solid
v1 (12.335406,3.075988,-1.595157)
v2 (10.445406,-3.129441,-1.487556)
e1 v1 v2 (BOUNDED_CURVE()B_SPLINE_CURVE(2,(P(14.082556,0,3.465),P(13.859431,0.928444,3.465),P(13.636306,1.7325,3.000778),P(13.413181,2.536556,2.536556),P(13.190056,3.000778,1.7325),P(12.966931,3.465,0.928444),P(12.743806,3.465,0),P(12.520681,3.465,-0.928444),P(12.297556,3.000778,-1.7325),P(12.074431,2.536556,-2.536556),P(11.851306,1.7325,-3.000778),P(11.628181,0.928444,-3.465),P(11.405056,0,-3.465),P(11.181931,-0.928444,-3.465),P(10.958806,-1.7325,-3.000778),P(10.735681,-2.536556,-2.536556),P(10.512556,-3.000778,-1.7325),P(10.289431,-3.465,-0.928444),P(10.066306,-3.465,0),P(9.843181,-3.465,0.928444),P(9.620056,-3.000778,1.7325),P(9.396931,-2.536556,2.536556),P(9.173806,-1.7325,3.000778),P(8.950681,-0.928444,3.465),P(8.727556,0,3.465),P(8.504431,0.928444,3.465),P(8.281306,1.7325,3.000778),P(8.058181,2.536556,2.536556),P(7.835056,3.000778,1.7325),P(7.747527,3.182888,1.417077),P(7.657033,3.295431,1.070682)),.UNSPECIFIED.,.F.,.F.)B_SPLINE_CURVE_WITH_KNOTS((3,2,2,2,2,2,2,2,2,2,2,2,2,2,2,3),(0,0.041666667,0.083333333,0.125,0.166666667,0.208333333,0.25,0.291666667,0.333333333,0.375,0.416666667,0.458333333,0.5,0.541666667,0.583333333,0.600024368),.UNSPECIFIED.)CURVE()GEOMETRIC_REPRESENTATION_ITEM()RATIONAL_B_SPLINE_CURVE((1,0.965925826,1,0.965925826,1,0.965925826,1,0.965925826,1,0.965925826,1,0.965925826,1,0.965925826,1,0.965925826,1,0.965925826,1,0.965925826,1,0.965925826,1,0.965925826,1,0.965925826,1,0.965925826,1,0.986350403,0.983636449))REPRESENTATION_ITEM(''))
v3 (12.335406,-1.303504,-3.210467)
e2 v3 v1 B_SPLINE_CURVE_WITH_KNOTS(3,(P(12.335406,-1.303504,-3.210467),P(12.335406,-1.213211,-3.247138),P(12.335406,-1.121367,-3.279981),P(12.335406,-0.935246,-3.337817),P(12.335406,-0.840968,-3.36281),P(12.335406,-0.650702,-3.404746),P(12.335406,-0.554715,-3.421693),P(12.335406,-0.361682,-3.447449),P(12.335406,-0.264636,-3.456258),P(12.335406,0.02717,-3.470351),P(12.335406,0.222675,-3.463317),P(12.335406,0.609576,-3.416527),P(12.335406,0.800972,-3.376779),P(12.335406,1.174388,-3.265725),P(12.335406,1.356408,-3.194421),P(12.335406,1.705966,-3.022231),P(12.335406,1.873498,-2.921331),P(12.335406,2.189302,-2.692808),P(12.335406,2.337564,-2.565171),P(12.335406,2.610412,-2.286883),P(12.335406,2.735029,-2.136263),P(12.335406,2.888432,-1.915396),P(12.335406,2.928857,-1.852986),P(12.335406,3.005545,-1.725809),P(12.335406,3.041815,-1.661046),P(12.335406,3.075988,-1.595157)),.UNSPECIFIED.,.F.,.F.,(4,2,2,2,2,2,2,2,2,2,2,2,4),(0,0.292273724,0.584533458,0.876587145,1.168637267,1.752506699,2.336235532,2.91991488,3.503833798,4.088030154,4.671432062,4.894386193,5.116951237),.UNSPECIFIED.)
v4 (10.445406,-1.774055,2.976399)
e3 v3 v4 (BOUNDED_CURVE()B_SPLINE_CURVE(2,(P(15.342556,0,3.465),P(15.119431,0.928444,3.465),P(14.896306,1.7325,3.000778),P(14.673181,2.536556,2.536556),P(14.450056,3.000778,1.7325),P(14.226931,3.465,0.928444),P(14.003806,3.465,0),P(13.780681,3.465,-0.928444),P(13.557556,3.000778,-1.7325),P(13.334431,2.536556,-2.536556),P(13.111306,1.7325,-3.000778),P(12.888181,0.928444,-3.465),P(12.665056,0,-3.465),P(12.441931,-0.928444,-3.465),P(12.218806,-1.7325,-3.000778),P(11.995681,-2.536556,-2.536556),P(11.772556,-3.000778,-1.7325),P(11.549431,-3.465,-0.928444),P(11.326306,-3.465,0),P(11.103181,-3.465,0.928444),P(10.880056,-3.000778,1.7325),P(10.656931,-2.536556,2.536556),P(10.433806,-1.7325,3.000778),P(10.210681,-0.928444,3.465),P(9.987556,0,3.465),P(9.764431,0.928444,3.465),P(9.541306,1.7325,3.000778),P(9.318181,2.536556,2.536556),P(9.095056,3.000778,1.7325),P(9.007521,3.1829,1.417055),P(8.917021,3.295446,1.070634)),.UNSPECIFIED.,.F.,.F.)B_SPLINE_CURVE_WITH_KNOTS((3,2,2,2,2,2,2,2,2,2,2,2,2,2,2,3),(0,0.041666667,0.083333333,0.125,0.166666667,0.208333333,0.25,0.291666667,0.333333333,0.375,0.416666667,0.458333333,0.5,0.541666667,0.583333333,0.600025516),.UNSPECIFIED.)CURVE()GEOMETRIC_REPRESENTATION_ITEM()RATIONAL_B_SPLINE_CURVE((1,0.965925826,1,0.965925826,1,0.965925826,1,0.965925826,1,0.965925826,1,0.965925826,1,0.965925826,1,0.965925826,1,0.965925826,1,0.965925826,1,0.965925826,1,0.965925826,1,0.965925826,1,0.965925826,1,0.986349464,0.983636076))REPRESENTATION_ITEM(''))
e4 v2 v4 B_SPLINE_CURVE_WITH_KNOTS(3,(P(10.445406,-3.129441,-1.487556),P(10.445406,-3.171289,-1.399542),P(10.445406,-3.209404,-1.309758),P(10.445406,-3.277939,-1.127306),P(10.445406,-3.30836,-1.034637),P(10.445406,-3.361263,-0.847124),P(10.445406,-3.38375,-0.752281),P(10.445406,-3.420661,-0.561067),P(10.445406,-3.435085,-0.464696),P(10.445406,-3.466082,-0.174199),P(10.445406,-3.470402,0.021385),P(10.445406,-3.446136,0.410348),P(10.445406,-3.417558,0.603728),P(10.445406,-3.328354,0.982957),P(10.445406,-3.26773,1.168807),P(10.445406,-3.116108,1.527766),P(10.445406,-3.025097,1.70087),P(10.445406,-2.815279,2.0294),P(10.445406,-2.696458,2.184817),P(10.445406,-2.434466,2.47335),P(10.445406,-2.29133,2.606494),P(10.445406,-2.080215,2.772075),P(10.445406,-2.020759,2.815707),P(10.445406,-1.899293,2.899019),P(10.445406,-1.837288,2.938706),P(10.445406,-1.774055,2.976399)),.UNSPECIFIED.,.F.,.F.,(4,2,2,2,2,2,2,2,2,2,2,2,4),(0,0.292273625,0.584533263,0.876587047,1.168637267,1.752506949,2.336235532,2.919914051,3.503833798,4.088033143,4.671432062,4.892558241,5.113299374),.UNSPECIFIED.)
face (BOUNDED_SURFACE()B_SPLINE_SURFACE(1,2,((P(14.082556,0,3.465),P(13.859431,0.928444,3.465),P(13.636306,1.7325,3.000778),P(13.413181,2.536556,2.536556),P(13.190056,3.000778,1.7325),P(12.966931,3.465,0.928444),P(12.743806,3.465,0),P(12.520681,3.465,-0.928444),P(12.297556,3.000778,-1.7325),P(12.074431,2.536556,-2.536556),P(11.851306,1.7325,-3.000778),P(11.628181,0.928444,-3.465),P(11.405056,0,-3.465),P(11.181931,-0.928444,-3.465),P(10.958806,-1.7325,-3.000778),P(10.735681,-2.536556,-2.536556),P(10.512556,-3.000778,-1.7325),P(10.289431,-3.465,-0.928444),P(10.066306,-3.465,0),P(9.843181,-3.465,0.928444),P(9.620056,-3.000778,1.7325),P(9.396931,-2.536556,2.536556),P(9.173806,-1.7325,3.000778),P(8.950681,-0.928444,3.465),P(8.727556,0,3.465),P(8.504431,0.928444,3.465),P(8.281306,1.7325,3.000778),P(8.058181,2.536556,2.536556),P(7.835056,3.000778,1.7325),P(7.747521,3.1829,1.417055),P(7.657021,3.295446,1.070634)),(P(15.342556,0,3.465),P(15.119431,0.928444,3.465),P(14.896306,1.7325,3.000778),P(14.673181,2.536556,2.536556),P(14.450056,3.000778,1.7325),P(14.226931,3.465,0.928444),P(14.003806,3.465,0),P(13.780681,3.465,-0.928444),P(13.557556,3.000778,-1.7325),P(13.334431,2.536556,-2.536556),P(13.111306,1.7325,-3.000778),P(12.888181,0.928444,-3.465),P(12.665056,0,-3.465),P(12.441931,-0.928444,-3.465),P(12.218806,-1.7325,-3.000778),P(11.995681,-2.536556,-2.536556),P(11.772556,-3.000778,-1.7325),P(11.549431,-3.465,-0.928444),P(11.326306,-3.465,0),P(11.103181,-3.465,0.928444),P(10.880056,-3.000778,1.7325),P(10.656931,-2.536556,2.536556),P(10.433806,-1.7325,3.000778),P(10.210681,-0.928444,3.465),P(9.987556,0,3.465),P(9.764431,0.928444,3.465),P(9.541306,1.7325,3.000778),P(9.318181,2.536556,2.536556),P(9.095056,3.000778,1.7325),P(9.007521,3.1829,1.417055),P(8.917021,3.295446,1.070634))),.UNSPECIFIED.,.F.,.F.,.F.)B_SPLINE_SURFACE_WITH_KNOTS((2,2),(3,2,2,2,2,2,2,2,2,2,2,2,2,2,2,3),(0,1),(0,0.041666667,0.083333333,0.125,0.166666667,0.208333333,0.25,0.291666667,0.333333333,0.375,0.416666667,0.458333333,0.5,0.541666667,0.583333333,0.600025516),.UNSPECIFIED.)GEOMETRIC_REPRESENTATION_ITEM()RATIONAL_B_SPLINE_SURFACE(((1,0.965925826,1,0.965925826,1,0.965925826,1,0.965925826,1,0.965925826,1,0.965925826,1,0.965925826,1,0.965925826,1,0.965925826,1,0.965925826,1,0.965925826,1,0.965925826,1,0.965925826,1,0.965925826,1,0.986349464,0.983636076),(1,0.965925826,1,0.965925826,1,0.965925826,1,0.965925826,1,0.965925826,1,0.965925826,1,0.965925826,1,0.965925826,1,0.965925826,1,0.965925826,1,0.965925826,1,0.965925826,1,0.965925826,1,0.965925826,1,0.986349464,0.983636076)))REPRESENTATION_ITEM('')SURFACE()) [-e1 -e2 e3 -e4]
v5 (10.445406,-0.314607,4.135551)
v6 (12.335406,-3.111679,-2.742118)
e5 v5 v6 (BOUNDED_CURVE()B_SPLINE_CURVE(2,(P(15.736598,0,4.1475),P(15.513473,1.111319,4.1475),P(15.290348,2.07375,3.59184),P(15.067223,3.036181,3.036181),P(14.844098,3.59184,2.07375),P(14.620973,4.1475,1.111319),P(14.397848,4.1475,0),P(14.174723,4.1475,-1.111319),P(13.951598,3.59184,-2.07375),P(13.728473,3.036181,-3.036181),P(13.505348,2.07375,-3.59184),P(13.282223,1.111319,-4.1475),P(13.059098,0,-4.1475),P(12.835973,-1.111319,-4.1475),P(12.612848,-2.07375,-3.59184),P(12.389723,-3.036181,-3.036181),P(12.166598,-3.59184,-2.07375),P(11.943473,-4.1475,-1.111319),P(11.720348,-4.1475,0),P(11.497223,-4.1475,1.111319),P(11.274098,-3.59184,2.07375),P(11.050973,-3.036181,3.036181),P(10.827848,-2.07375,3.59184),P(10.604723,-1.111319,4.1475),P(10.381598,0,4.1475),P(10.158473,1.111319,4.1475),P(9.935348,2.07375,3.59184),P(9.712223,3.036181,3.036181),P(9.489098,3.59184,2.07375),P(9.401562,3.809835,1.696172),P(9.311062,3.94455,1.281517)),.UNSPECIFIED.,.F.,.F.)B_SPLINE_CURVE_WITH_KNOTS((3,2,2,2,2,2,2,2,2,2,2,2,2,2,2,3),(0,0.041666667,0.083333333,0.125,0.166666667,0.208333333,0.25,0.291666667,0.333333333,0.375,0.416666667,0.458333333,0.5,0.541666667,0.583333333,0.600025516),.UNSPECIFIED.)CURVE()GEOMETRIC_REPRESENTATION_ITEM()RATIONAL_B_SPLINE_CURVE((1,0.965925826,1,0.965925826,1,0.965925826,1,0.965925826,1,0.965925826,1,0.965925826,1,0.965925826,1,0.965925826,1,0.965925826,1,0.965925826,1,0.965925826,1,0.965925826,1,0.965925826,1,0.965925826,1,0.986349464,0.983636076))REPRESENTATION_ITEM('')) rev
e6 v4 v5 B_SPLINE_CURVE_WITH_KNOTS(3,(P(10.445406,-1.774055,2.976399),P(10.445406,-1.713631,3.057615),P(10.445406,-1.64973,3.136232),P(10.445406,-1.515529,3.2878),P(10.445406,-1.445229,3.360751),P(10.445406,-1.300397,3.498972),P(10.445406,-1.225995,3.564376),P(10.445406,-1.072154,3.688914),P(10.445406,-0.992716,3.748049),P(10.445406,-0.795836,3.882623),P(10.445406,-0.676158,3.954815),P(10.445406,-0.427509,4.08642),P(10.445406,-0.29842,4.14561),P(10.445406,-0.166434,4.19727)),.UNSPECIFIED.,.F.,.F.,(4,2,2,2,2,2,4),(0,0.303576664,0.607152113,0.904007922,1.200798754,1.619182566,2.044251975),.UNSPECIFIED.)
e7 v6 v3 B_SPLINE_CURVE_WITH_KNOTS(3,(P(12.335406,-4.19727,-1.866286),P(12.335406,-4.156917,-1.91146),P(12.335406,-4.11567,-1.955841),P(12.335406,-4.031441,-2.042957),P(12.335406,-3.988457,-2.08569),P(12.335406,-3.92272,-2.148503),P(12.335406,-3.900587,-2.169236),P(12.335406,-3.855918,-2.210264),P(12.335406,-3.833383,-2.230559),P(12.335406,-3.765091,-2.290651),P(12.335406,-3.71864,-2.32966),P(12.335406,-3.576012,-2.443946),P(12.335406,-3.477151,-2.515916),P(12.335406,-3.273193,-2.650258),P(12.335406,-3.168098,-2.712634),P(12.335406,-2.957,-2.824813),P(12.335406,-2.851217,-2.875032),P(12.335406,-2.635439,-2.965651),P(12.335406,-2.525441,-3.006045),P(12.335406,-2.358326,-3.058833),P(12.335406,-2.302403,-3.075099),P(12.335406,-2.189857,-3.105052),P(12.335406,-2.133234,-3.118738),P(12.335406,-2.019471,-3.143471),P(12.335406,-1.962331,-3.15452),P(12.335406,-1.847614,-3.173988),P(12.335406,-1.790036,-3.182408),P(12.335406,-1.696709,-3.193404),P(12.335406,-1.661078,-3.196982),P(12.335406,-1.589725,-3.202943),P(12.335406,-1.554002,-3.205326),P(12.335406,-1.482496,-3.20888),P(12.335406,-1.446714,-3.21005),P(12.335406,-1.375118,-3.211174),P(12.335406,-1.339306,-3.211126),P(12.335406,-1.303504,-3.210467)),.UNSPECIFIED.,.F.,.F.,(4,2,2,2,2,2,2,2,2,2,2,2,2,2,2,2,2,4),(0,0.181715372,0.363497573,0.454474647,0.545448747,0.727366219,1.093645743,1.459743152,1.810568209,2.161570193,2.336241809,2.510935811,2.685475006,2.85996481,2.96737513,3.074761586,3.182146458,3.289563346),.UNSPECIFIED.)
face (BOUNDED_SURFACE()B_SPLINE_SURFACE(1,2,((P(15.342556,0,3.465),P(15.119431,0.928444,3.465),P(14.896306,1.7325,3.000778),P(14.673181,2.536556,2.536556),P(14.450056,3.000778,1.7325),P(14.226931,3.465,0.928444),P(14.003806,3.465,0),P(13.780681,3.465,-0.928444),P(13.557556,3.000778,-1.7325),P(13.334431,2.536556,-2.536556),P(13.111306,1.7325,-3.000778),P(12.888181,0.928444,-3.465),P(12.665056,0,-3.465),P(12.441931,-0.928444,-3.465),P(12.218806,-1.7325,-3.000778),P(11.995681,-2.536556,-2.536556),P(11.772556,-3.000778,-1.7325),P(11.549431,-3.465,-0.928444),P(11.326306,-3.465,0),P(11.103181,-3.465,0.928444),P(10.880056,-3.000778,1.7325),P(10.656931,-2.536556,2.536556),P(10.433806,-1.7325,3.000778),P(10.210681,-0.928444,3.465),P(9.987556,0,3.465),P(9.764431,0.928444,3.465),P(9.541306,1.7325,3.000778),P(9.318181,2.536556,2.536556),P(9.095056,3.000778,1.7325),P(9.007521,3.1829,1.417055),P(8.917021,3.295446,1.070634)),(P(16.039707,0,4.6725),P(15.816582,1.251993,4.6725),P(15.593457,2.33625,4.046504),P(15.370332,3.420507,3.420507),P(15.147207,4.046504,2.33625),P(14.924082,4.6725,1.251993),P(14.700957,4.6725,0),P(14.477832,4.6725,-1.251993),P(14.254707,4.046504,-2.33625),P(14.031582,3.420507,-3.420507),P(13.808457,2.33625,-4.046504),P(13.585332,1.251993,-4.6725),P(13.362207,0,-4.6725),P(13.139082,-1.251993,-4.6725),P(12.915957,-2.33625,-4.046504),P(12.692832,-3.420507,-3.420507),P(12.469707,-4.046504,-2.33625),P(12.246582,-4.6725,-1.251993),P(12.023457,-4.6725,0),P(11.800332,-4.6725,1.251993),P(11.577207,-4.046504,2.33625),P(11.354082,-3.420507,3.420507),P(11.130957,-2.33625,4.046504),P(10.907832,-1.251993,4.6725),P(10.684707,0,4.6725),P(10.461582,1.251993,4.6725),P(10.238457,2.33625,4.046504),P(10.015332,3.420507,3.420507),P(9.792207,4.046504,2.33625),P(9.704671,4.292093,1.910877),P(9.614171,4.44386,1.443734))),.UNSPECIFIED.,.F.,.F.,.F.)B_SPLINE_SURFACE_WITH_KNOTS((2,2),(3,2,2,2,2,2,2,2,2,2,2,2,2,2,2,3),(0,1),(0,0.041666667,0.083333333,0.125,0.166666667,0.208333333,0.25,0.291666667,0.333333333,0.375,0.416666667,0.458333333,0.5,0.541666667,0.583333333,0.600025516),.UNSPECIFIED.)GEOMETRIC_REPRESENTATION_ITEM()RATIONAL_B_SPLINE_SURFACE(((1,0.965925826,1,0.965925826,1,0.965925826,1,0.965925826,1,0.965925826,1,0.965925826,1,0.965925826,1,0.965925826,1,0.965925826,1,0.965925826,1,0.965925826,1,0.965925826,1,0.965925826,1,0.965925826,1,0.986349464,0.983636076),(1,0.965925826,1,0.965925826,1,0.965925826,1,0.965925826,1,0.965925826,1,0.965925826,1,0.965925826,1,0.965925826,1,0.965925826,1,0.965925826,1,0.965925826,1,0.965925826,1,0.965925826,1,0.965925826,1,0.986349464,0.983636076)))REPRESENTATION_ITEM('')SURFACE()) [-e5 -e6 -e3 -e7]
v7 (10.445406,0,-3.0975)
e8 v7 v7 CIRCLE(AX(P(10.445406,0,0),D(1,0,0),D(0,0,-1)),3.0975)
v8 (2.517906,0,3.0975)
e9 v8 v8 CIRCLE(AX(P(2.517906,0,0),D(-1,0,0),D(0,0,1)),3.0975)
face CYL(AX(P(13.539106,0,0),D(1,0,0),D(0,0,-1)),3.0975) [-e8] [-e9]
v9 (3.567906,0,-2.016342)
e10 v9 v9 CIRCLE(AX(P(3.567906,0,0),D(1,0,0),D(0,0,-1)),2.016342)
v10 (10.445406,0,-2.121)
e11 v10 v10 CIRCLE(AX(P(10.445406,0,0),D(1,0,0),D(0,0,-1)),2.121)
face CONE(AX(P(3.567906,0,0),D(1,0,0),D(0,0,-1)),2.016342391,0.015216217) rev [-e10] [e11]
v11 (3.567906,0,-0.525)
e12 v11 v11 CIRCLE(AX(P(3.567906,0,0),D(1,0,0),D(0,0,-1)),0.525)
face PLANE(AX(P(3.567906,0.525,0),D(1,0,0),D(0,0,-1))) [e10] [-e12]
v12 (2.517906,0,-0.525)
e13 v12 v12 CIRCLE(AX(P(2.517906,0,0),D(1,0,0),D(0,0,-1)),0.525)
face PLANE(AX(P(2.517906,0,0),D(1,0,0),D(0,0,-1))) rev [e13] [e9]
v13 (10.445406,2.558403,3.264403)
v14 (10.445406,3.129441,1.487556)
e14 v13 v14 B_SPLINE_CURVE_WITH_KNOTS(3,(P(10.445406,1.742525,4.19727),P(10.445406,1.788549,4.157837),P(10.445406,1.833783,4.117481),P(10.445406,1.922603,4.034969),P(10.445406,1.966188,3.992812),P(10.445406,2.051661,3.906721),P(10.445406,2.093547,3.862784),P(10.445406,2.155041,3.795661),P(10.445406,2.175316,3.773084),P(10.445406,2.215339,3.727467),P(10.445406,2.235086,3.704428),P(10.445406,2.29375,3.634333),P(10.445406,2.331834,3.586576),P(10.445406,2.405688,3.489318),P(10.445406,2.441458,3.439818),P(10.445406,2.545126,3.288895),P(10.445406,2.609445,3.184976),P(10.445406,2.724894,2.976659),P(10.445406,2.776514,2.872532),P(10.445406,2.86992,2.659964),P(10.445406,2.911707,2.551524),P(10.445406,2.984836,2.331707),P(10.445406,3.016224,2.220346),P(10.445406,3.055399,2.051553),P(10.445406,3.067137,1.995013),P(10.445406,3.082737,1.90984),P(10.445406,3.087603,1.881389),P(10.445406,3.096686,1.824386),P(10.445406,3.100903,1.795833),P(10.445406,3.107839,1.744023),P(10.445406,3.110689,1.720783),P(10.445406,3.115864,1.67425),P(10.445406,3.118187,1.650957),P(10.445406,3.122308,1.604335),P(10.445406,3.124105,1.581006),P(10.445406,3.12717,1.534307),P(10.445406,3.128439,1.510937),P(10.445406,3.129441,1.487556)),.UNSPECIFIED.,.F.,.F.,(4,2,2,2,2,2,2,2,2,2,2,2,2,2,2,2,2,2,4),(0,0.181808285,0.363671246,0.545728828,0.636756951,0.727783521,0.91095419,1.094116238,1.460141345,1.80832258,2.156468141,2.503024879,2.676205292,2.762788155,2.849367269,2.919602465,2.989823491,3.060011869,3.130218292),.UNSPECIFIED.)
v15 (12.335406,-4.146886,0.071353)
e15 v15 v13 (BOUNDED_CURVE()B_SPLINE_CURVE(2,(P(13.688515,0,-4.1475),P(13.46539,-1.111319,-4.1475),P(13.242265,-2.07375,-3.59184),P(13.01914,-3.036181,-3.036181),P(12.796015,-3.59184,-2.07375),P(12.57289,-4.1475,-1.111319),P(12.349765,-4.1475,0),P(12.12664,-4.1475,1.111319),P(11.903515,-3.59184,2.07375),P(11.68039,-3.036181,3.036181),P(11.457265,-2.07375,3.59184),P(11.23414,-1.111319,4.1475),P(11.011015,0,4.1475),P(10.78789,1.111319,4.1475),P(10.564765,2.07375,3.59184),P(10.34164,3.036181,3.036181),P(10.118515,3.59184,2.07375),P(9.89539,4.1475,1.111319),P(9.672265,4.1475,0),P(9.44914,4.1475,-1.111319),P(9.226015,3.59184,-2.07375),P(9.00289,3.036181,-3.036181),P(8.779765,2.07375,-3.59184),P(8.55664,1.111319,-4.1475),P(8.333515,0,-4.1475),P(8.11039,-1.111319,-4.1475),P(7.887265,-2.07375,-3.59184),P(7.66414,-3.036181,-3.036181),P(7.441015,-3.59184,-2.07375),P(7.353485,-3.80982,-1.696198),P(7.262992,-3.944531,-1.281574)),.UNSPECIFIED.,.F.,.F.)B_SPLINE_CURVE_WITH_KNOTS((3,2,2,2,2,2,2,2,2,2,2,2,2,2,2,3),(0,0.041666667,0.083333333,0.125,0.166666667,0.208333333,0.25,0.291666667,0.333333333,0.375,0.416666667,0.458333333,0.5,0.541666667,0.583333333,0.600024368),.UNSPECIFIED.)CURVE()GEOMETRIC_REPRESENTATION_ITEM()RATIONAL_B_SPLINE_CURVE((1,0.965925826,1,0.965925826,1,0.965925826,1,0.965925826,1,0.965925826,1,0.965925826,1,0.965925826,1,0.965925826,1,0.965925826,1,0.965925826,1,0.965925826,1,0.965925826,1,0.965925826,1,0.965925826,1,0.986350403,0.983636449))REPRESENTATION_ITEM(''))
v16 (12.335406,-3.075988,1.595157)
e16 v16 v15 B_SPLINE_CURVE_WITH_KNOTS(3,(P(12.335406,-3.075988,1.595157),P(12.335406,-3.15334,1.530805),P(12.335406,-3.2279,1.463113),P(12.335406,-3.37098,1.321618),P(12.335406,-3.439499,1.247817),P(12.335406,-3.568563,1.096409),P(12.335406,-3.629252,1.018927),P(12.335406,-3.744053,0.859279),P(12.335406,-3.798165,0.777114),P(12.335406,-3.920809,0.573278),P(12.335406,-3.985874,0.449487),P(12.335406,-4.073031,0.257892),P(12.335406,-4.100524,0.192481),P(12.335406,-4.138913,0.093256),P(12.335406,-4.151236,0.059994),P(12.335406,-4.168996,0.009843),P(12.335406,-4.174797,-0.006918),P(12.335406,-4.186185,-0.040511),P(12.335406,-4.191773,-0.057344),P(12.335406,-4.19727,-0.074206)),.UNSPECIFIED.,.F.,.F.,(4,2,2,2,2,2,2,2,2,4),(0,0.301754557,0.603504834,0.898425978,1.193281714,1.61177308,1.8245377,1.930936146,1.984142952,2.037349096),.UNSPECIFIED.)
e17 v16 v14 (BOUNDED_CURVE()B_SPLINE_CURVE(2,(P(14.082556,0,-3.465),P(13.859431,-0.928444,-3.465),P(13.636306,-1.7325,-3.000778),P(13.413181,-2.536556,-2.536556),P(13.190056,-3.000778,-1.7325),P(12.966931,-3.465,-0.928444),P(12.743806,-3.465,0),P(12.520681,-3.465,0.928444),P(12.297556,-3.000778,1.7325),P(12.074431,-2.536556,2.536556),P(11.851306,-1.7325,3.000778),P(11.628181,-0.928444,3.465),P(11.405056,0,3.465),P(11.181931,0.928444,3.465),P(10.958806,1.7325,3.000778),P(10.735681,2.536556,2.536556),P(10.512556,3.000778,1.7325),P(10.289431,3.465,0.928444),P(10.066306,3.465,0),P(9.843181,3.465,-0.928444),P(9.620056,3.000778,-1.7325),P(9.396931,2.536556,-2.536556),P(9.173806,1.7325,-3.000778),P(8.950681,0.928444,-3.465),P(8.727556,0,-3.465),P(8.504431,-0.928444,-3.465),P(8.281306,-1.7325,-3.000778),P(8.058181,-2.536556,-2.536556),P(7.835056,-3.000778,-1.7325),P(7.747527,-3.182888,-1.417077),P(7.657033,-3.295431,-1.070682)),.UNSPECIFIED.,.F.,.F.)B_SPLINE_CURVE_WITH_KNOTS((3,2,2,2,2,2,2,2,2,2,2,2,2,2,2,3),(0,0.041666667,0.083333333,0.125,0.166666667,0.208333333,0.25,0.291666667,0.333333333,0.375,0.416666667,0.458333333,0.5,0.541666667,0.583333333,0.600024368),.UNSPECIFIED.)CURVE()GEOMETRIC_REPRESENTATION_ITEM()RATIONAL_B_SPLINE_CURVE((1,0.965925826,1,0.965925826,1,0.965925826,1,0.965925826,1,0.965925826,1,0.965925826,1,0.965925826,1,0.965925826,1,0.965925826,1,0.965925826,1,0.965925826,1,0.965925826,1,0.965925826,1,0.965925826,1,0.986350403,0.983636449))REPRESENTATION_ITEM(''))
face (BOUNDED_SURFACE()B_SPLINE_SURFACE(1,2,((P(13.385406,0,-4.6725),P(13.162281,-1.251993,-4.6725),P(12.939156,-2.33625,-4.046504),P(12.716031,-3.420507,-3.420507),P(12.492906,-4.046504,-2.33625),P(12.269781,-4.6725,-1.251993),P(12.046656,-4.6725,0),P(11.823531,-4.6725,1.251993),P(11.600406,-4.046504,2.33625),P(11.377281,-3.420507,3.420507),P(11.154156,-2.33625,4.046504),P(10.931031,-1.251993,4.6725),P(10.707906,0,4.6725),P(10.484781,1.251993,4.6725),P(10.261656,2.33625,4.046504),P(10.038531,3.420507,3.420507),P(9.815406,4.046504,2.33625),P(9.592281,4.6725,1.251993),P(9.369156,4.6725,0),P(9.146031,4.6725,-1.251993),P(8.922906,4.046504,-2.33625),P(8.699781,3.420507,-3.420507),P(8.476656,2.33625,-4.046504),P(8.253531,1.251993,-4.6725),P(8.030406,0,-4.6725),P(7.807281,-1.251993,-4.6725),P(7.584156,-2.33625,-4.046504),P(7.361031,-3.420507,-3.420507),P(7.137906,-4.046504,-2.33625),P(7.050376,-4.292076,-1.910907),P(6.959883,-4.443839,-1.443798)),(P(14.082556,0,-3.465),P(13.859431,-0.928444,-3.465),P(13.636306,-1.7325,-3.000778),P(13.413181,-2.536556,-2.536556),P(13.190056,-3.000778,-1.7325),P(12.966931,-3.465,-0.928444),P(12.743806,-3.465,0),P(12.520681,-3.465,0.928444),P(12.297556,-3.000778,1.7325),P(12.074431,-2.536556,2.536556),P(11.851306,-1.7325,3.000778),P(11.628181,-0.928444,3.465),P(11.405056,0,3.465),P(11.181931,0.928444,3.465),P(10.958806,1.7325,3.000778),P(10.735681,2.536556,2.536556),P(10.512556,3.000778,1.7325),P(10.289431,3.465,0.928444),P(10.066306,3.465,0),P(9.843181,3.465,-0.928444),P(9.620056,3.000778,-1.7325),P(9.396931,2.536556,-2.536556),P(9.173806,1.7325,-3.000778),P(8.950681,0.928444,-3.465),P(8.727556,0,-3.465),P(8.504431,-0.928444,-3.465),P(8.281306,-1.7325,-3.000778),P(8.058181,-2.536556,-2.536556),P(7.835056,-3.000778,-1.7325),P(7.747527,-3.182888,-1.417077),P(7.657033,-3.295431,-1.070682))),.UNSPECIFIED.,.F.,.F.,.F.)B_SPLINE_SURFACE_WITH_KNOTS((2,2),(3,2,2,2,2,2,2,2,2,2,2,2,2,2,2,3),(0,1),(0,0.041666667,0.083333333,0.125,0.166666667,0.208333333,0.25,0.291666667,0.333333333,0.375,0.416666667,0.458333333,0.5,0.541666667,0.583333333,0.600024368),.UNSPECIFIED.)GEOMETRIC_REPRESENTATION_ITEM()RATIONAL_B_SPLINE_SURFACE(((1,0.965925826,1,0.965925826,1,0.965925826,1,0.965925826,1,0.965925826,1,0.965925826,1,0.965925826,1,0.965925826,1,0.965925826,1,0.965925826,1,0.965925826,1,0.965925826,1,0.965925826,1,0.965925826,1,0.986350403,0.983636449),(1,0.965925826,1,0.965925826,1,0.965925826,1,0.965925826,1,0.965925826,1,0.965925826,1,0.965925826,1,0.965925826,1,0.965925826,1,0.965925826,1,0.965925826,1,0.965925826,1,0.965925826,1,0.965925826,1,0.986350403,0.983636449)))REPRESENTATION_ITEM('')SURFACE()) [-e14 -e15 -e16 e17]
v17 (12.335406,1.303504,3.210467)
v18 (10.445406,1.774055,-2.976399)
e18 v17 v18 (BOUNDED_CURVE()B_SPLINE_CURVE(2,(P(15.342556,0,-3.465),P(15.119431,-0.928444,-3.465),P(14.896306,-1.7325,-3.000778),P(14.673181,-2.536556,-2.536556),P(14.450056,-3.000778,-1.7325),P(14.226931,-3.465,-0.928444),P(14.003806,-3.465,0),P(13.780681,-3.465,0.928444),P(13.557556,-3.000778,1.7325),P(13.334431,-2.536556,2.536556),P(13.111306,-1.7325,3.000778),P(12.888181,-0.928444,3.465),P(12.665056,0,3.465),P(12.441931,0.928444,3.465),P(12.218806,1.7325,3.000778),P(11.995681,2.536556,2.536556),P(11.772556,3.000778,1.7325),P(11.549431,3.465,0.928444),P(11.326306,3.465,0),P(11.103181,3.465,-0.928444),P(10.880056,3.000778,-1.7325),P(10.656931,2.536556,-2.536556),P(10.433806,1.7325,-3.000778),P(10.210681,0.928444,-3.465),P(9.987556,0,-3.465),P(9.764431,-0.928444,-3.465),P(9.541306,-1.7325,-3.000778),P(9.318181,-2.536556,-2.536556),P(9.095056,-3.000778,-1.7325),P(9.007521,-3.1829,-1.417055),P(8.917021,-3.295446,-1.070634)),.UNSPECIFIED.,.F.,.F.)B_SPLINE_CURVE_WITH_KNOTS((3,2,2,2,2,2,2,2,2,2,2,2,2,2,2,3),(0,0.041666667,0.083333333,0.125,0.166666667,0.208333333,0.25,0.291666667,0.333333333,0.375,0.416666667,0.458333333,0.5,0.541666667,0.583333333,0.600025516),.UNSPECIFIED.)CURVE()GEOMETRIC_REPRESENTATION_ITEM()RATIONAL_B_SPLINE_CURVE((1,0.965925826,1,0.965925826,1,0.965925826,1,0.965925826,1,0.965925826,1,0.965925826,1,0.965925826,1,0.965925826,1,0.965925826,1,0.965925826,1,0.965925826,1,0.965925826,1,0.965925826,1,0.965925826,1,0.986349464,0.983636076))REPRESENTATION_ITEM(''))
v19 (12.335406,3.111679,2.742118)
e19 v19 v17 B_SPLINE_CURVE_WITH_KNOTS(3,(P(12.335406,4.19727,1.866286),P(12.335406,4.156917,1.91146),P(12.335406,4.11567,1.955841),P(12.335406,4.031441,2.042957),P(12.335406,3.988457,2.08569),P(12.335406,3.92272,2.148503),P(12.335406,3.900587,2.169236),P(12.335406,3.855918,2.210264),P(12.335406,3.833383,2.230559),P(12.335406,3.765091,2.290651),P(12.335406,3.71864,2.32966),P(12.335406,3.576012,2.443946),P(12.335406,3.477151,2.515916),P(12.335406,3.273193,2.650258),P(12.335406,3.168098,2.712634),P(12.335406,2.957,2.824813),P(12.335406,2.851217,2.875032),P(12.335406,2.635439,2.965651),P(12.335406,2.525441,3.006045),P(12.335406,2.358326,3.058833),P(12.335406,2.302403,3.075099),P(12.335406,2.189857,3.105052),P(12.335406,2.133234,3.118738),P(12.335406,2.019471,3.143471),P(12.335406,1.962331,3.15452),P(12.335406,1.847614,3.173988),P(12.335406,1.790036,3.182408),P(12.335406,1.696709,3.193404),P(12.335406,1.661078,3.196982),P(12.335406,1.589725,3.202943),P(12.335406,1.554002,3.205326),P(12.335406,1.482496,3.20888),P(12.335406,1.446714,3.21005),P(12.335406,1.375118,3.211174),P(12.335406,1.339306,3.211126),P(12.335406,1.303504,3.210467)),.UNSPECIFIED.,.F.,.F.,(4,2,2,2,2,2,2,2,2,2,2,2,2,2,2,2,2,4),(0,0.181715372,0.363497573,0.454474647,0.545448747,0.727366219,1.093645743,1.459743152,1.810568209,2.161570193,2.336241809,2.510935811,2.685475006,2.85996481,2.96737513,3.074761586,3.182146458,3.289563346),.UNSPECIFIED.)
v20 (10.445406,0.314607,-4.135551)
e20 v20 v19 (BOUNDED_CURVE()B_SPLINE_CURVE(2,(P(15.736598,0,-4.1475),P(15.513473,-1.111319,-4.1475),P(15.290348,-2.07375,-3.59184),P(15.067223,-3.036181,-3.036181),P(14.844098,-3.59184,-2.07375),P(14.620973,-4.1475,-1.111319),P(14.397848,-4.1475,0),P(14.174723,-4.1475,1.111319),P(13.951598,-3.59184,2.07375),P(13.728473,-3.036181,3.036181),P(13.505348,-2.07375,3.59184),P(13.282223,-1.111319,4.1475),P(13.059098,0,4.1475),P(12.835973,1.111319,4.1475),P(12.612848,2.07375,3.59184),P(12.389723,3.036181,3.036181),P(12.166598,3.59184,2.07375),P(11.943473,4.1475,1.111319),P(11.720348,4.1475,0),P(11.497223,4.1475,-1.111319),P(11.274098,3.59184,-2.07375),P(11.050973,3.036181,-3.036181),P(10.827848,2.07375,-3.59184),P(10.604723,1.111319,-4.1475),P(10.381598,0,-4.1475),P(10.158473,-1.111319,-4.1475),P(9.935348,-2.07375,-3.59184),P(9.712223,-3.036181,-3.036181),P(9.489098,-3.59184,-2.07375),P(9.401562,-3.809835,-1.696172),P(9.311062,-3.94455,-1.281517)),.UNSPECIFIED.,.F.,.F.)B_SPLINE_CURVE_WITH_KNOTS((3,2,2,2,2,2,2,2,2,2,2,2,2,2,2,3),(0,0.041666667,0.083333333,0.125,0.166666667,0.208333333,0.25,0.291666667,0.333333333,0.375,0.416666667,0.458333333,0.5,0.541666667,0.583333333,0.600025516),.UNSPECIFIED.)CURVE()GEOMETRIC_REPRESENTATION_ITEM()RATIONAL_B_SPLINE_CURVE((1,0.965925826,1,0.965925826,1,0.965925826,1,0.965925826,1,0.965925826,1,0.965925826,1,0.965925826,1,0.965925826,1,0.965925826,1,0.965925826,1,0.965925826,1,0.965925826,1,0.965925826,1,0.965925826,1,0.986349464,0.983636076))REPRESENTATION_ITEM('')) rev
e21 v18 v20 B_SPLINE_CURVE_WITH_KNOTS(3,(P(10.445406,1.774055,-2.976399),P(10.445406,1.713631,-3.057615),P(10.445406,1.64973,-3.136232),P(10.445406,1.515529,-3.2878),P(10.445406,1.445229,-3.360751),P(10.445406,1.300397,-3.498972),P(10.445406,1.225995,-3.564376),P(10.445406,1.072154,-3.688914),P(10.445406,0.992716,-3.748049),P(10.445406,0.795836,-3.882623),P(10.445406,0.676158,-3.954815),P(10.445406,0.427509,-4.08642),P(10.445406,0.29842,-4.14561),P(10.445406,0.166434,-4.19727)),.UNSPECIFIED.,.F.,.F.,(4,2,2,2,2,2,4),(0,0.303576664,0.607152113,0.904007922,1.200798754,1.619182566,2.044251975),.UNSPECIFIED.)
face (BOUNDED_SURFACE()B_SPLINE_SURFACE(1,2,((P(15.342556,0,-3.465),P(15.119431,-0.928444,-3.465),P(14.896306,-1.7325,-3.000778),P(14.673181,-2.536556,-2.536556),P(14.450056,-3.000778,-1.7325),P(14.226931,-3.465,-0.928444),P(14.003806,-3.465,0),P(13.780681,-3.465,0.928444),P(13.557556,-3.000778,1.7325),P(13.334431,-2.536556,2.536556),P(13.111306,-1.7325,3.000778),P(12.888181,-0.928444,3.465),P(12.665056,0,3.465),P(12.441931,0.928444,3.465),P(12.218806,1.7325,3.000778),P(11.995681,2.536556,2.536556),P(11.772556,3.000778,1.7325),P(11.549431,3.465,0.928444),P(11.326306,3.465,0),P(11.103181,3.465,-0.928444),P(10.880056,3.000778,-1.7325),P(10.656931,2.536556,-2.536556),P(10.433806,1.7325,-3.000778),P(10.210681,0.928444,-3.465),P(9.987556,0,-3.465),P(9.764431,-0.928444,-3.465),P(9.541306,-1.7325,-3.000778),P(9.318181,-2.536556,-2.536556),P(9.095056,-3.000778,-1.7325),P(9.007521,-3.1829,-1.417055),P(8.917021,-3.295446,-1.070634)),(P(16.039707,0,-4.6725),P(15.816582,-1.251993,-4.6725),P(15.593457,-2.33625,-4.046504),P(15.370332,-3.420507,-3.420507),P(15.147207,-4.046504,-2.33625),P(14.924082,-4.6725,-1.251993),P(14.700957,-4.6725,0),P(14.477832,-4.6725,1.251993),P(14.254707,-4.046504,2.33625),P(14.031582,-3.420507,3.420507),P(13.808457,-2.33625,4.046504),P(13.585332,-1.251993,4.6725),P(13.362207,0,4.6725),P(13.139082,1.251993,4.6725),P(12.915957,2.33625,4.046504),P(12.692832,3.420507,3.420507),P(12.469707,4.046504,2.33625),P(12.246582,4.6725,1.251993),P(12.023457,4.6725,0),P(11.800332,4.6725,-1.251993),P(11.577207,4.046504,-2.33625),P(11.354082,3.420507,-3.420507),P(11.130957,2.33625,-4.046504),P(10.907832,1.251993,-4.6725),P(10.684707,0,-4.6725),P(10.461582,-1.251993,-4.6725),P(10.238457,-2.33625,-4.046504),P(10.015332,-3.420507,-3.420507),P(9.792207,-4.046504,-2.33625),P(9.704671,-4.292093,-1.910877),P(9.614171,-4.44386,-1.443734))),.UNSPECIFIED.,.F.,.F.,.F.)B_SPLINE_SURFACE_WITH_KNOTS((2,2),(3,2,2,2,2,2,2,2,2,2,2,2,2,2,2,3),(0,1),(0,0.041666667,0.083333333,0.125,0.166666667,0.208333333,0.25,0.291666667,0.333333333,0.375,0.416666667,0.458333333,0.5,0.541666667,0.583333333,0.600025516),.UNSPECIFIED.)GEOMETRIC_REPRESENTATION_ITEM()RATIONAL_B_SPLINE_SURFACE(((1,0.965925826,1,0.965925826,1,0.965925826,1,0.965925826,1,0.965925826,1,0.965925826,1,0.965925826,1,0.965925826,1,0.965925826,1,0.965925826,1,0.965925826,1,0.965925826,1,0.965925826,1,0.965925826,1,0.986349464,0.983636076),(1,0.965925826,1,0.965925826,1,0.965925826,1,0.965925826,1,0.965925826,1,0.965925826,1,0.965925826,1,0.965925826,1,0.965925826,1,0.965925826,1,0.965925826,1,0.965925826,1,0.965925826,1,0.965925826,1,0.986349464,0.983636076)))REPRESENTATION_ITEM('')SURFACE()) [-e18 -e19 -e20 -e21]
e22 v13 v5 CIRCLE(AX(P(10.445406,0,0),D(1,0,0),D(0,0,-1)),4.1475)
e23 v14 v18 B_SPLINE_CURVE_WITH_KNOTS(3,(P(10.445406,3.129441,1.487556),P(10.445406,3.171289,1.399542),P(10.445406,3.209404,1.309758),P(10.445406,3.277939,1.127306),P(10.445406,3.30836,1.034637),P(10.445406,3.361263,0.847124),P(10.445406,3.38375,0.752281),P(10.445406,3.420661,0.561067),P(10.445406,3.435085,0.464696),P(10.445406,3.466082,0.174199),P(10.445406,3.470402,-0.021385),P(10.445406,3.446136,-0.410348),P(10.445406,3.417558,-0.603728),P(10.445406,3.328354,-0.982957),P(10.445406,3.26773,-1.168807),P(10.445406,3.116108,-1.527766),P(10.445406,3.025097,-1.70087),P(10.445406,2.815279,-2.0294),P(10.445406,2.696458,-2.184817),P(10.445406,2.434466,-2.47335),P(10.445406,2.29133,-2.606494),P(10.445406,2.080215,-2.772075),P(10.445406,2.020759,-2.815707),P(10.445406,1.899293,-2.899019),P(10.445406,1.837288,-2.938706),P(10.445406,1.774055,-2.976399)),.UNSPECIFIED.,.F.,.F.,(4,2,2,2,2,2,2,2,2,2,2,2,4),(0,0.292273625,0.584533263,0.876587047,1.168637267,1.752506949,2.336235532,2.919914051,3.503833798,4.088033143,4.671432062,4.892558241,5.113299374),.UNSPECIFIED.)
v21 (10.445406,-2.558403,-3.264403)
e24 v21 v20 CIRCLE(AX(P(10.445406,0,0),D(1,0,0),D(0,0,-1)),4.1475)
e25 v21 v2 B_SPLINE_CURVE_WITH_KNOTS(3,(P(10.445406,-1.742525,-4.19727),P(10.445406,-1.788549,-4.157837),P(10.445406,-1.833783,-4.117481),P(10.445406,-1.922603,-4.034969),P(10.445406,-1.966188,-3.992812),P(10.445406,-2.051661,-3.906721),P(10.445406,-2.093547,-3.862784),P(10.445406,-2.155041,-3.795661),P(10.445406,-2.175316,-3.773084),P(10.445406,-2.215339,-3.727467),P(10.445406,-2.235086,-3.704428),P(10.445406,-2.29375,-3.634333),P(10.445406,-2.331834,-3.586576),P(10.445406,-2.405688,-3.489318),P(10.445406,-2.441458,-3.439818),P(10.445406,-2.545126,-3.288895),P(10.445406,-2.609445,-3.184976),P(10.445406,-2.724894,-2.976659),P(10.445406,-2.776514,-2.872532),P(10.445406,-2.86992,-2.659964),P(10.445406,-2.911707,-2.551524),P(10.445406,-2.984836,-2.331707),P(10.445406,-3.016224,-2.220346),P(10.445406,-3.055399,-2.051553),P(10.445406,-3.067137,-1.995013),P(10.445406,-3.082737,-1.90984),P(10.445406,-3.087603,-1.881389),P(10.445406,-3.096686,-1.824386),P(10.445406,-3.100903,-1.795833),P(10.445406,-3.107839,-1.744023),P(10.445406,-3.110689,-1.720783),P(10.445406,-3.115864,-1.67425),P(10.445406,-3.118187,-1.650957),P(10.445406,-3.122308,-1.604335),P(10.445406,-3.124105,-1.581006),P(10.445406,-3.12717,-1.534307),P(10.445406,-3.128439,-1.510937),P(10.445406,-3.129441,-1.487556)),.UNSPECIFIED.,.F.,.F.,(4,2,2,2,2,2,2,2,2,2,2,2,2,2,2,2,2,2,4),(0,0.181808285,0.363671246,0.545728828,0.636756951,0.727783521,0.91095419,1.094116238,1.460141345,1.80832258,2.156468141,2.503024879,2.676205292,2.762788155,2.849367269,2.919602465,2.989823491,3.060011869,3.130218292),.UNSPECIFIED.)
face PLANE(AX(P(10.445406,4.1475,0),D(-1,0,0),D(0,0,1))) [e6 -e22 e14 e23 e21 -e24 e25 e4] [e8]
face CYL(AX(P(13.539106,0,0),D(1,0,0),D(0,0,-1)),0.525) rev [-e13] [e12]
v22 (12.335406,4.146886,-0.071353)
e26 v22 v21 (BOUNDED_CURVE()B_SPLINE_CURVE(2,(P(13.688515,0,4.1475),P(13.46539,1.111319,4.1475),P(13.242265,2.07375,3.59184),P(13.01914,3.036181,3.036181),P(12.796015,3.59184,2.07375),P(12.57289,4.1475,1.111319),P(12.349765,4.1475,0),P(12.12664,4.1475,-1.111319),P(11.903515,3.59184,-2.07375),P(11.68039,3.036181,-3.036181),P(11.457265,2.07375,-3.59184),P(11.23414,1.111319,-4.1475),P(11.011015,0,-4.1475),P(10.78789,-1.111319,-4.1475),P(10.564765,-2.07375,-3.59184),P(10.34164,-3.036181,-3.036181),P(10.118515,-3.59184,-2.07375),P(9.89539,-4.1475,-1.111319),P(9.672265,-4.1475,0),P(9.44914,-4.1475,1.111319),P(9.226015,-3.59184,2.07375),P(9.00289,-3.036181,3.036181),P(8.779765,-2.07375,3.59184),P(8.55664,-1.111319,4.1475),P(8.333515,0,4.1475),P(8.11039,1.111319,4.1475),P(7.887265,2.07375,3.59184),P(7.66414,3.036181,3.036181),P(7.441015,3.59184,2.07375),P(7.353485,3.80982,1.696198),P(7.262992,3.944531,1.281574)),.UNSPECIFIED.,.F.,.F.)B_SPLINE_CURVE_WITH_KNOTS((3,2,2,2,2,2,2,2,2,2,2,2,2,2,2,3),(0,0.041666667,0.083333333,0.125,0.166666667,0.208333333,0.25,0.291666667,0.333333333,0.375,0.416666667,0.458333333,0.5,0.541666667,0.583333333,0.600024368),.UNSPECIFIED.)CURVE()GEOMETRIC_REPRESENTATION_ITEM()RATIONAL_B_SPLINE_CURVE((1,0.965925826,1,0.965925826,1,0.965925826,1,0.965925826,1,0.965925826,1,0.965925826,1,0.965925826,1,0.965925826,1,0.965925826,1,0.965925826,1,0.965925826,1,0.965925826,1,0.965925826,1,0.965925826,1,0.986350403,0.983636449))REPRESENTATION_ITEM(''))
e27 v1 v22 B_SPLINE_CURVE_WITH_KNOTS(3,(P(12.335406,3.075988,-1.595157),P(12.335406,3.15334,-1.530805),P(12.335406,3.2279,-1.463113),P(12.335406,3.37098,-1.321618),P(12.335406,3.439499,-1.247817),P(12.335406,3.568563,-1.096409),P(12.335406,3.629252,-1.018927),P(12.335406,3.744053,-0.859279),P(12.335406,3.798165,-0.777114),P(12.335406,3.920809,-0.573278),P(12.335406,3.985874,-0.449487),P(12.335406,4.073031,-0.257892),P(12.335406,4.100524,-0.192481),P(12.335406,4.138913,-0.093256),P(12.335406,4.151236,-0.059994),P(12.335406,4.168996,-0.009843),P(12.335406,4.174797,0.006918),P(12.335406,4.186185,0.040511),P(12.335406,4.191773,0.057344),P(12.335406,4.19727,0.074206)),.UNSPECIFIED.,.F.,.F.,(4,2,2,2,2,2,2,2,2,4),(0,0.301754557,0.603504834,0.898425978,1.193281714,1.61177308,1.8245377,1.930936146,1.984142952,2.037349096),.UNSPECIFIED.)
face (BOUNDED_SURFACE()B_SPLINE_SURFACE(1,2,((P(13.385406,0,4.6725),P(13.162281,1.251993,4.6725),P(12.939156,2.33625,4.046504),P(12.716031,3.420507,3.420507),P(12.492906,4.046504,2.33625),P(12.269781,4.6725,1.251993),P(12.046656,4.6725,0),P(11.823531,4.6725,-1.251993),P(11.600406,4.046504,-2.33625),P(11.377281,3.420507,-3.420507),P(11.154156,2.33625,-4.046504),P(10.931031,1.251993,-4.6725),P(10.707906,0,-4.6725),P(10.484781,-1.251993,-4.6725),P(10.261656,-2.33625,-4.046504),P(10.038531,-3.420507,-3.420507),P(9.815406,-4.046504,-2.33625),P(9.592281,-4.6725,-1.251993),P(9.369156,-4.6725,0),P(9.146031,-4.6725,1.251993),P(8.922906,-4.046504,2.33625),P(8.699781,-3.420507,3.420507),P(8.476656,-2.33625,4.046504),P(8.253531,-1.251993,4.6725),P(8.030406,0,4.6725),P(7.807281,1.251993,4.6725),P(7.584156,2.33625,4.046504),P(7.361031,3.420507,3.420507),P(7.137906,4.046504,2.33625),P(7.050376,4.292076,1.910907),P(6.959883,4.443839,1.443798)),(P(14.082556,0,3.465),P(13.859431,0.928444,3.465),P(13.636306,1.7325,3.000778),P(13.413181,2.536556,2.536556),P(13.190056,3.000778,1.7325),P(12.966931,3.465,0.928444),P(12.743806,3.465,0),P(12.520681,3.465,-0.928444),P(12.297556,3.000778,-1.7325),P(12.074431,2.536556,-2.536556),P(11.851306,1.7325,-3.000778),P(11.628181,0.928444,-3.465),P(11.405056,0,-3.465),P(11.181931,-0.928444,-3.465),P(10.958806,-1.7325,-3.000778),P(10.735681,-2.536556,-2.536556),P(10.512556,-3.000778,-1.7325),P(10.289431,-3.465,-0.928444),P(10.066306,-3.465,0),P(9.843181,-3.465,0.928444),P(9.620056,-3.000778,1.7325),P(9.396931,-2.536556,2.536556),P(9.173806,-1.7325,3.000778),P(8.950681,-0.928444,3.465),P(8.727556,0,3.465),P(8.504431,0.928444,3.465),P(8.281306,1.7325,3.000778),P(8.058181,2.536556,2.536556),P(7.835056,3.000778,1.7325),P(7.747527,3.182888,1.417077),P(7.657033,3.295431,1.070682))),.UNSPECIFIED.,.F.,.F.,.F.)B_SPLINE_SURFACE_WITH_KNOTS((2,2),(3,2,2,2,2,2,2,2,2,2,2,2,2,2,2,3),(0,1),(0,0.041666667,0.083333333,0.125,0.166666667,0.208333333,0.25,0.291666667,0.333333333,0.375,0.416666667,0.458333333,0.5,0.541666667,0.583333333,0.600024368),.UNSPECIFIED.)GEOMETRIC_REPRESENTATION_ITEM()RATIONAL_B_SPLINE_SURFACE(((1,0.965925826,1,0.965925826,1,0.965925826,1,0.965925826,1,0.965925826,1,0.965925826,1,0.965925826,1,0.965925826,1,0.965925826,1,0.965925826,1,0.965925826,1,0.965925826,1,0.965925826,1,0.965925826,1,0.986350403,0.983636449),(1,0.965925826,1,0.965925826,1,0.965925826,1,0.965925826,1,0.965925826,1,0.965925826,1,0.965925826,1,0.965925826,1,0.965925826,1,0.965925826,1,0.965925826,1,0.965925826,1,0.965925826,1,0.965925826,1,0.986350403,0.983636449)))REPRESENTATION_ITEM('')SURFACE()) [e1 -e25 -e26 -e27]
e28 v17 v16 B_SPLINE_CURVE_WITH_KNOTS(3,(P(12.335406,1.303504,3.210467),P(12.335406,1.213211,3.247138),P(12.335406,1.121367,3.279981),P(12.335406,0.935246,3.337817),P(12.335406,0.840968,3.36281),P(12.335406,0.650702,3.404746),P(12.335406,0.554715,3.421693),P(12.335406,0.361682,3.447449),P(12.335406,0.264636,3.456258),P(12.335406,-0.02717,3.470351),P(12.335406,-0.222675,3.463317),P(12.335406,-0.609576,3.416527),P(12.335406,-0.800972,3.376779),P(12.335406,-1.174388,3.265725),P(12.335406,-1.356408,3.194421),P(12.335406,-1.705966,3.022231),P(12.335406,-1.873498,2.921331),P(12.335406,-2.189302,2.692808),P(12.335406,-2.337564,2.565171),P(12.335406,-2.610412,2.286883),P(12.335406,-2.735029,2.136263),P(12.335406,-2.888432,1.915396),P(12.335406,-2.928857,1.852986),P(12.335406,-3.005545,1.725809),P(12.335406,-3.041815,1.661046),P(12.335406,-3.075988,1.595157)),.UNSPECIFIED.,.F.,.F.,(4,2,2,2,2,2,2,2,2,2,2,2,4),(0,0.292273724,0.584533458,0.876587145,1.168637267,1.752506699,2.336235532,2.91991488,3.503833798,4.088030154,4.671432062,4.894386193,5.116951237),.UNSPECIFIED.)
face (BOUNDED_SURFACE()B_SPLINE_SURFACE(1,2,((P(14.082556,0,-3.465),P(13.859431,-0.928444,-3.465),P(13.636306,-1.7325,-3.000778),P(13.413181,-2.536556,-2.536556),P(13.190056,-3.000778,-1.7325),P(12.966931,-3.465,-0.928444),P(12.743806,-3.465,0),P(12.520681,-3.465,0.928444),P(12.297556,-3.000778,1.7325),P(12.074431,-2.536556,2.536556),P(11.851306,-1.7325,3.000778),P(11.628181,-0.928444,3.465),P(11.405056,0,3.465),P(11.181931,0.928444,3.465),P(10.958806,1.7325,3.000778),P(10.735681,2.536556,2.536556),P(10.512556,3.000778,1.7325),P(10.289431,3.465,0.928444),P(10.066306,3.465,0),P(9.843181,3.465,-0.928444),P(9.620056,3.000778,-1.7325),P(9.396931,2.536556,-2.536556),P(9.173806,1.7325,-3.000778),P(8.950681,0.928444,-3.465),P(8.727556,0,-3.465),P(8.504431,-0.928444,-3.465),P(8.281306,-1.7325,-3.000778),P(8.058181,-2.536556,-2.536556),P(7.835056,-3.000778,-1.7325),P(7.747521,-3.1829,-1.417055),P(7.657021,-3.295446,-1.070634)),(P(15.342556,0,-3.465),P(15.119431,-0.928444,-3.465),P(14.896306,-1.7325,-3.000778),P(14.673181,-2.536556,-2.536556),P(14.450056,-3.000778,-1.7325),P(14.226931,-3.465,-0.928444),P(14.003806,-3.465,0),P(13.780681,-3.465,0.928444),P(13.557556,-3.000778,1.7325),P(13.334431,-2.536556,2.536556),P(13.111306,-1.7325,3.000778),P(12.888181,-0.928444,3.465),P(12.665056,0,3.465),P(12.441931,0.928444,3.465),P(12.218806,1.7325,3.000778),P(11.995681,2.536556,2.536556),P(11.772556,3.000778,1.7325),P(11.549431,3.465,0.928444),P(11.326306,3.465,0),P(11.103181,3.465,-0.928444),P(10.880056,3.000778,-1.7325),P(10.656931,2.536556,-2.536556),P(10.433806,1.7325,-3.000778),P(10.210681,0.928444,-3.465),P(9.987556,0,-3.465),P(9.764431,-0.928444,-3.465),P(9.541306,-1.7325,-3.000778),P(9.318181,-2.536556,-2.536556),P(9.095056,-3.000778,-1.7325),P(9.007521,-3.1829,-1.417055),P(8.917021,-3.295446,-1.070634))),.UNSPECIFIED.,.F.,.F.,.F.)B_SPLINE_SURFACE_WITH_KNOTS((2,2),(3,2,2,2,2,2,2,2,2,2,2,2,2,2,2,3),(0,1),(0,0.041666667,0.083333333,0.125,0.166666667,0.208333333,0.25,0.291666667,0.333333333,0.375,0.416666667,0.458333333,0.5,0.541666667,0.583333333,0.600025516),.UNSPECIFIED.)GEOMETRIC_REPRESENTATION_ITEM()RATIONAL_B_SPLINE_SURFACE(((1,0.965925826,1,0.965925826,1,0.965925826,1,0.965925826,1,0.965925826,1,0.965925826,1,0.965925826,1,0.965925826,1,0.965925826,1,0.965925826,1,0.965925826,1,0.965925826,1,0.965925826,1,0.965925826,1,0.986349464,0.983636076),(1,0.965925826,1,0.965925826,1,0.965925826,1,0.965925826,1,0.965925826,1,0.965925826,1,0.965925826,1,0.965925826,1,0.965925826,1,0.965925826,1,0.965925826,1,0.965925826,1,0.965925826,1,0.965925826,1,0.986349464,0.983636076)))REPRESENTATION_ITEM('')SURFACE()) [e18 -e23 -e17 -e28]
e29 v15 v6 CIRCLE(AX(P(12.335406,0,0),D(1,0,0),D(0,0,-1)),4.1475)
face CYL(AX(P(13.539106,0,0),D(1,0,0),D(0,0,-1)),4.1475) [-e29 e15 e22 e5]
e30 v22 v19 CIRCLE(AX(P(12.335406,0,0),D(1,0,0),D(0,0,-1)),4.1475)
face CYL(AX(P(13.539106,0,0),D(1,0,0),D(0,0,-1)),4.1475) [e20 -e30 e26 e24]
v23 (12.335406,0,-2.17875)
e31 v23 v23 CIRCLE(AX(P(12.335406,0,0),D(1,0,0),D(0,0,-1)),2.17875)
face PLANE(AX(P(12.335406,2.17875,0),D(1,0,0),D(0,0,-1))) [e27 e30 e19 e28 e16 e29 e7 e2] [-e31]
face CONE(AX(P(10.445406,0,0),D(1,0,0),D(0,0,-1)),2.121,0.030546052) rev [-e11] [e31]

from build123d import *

# Parameters (mm, degrees)
ESQUISSE2_OUTSIDE_W                   = 16.214
ESQUISSE2_OUTSIDE_H                   = 16.214
ENL_V_MAT_EXTRU_1_DEPTH               = 17.967468874
ENL_VEMENT_DE_MATI_RE_BALAYAGE2_PITCH = 5.1
R_P_TITION_CIRCULAIRE1_COUNT          = 2
ENL_VEMENT_DE_MATI_RE_BALAYAGE3_PITCH = 0.85
CONG_1_R                              = 0.2
SCALE1_SCALE                          = 1.05


with BuildPart() as part:
    # Esquisse1 → Révolution1 (revolve)
    with BuildSketch(Plane.XY, mode=Mode.PRIVATE) as r_volution1_sk:
        Polygon((10.309090909, 2.95), (5.709090909, 2.95), (5.709090909, 4.55), (3.309090909, 4.55), (2.309090909, 3.175), (-3.190909091, 3.175), (-3.190909091, 1.4), (-4.490909091, 1.075), (-5.690909091, 1.075), (-5.690909091, 1.3), (-8.690909091, 0.85), (-9.990909091, 0.85), (-9.990909091, 0.5), (3.759090909, 0.5), (3.759090909, 1.920326087), (5.709090909, 1.95), (10.309090909, 2.02), (12.109090909, 2.075), (12.109090909, 3.95), (10.309090909, 3.95), align=None)
    revolve(r_volution1_sk.sketch.rotate(Axis((13.255472394, 0, 0), (-1, 0, 0)), 90), axis=Axis((13.255472394, 0, 0), (-1, 0, 0)))

    # Esquisse2 outside → Enlèv. mat.-Extru.1 (cut, through all)
    with BuildSketch(Plane(origin=(5.709090909, 0, 0), x_dir=(0, 0, -1), z_dir=(1, 0, 0))):
        Rectangle(ESQUISSE2_OUTSIDE_W, ESQUISSE2_OUTSIDE_H)
        Polygon((0, -4.618802154), (4, -2.309401077), (4, 2.309401077), (0, 4.618802154), (-4, 2.309401077), (-4, -2.309401077), align=None, mode=Mode.SUBTRACT)
    extrude(amount=-ENL_V_MAT_EXTRU_1_DEPTH, mode=Mode.SUBTRACT)

    # Enlèvement de matière-Balayage2: the profile of Esquisse5 screwed along a right-hand helix of 1.2 turns, 12 arcs to a turn; built about Z, then put on its axis
    enl_vement_de_mati_re_balayage2_z = Axis((0, 0, 0), (0, 0, 1))
    enl_vement_de_mati_re_balayage2_corners = [(4.45, 0, 0), (3.3, 0, -0.66395281), (3.3, 0, -1.86395281), (4.45, 0, -2.527905619)]
    with BuildLine(mode=Mode.PRIVATE) as enl_vement_de_mati_re_balayage2_profile:
        Line(enl_vement_de_mati_re_balayage2_corners[0], enl_vement_de_mati_re_balayage2_corners[1])
        Line(enl_vement_de_mati_re_balayage2_corners[1], enl_vement_de_mati_re_balayage2_corners[2])
        Line(enl_vement_de_mati_re_balayage2_corners[2], enl_vement_de_mati_re_balayage2_corners[3])
        Line(enl_vement_de_mati_re_balayage2_corners[3], enl_vement_de_mati_re_balayage2_corners[0])
    enl_vement_de_mati_re_balayage2_cap = Face(enl_vement_de_mati_re_balayage2_profile.wire())
    enl_vement_de_mati_re_balayage2_turn_angles = [0, 15, 30, 45, 60, 75, 90, 105, 120, 135, 150, 165, 180, 195, 210, 225, 240, 255, 270, 285, 300, 315, 330, 345, 360]
    enl_vement_de_mati_re_balayage2_turn_weights = [1, 0.9659258262890683, 1, 0.9659258262890683, 1, 0.9659258262890683, 1, 0.9659258262890683, 1, 0.9659258262890683, 1, 0.9659258262890683, 1, 0.9659258262890683, 1, 0.9659258262890683, 1, 0.9659258262890683, 1, 0.9659258262890683, 1, 0.9659258262890683, 1, 0.9659258262890683, 1]
    enl_vement_de_mati_re_balayage2_turn_rails = [Edge.make_bspline([Vector(p[0], p[1], 0).rotate(enl_vement_de_mati_re_balayage2_z, enl_vement_de_mati_re_balayage2_turn_angles[k]) / enl_vement_de_mati_re_balayage2_turn_weights[k] + Vector(0, 0, p[2] + ENL_VEMENT_DE_MATI_RE_BALAYAGE2_PITCH * enl_vement_de_mati_re_balayage2_turn_angles[k] / 360) for k in range(25)], [0, 0, 0, 1, 1, 2, 2, 3, 3, 4, 4, 5, 5, 6, 6, 7, 7, 8, 8, 9, 9, 10, 10, 11, 11, 12, 12, 12], 2, enl_vement_de_mati_re_balayage2_turn_weights) for p in enl_vement_de_mati_re_balayage2_corners]
    enl_vement_de_mati_re_balayage2_turn_sides = [Face.make_surface_from_curves(enl_vement_de_mati_re_balayage2_turn_rails[p[0]], enl_vement_de_mati_re_balayage2_turn_rails[p[1]]) for p in [(0, 1), (1, 2), (2, 3), (3, 0)]]
    enl_vement_de_mati_re_balayage2_last_angles = [360, 375, 390, 405, 420, 426, 432]
    enl_vement_de_mati_re_balayage2_last_weights = [1, 0.9659258262890683, 1, 0.9659258262890683, 1, 0.9945218953682725, 1]
    enl_vement_de_mati_re_balayage2_last_rails = [Edge.make_bspline([Vector(p[0], p[1], 0).rotate(enl_vement_de_mati_re_balayage2_z, enl_vement_de_mati_re_balayage2_last_angles[k]) / enl_vement_de_mati_re_balayage2_last_weights[k] + Vector(0, 0, p[2] + ENL_VEMENT_DE_MATI_RE_BALAYAGE2_PITCH * enl_vement_de_mati_re_balayage2_last_angles[k] / 360) for k in range(7)], [0, 0, 0, 1, 1, 2, 2, 3, 3, 3], 2, enl_vement_de_mati_re_balayage2_last_weights) for p in enl_vement_de_mati_re_balayage2_corners]
    enl_vement_de_mati_re_balayage2_last_sides = [Face.make_surface_from_curves(enl_vement_de_mati_re_balayage2_last_rails[p[0]], enl_vement_de_mati_re_balayage2_last_rails[p[1]]) for p in [(0, 1), (1, 2), (2, 3), (3, 0)]]
    enl_vement_de_mati_re_balayage2 = Plane(origin=(13.109090909, 0, 0), x_dir=(0, 0, -1), z_dir=(-1, 0, 0)) * Solid(Shell([*enl_vement_de_mati_re_balayage2_turn_sides, *enl_vement_de_mati_re_balayage2_last_sides, enl_vement_de_mati_re_balayage2_cap, enl_vement_de_mati_re_balayage2_cap.rotate(enl_vement_de_mati_re_balayage2_z, 432).moved(Location((0, 0, ENL_VEMENT_DE_MATI_RE_BALAYAGE2_PITCH * 432 / 360)))]))
    add(enl_vement_de_mati_re_balayage2, mode=Mode.SUBTRACT)

    # Répétition circulaire1: Enlèvement de matière-Balayage2 ×2 about axis
    r_p_tition_circulaire1_axis = Axis((3.759090909, 0, 0), (1, 0, 0))
    for i in range(1, R_P_TITION_CIRCULAIRE1_COUNT):
        add(enl_vement_de_mati_re_balayage2.rotate(r_p_tition_circulaire1_axis, i * 360 / R_P_TITION_CIRCULAIRE1_COUNT), mode=Mode.SUBTRACT)

    # Esquisse6 → Enlèvement de matière-Révolution2 (revolve, cut)
    with BuildSketch(Plane(origin=(0, 0, 0), x_dir=(1, 0, 0), z_dir=(0, 0, -1)), mode=Mode.PRIVATE) as enl_vement_de_mati_re_r_volution2_sk:
        with BuildLine():
            Line((5.209090909, 4.598364037), (5.709090909, 4.598364037))
            Line((5.709090909, 4.598364037), (5.709090909, 2.95))
            ThreePointArc((5.709090909, 2.95), (5.581340735, 3.811264187), (5.209090909, 4.598364037))
        make_face()
        Polygon((2.309090909, -3.175), (-3.190909091, -2.95), (-3.190909091, -3.175), align=None)
    revolve(enl_vement_de_mati_re_r_volution2_sk.sketch.rotate(Axis((-1.819283659, 0, 0), (1, 0, 0)), 270), axis=Axis((-1.819283659, 0, 0), (1, 0, 0)), mode=Mode.SUBTRACT)


with BuildPart() as body_2:
    # Fractionner1: the piece on the far side of the plane
    add(part.part)
    split(bisect_by=Plane(origin=(2.309090909, 0, 0), x_dir=(0, 0, 1), z_dir=(1, 0, 0)), keep=Keep.BOTTOM)

    # Enlèvement de matière-Balayage3: the profile of Esquisse8 screwed along a right-hand helix of 12 turns, 8 arcs to a turn; built about Z, then put on its axis
    enl_vement_de_mati_re_balayage3_z = Axis((0, 0, 0), (0, 0, 1))
    enl_vement_de_mati_re_balayage3_corners = [(2.65, 0, -0.05), (2.65, 0, 0.05), (3.3433932, 0, 0.5), (3.3433932, 0, -0.5)]
    with BuildLine(mode=Mode.PRIVATE) as enl_vement_de_mati_re_balayage3_profile:
        Line(enl_vement_de_mati_re_balayage3_corners[0], enl_vement_de_mati_re_balayage3_corners[1])
        Line(enl_vement_de_mati_re_balayage3_corners[1], enl_vement_de_mati_re_balayage3_corners[2])
        Line(enl_vement_de_mati_re_balayage3_corners[2], enl_vement_de_mati_re_balayage3_corners[3])
        Line(enl_vement_de_mati_re_balayage3_corners[3], enl_vement_de_mati_re_balayage3_corners[0])
    enl_vement_de_mati_re_balayage3_cap = Face(enl_vement_de_mati_re_balayage3_profile.wire())
    enl_vement_de_mati_re_balayage3_turn_angles = [0, 22.5, 45, 67.5, 90, 112.5, 135, 157.5, 180, 202.5, 225, 247.5, 270, 292.5, 315, 337.5, 360]
    enl_vement_de_mati_re_balayage3_turn_weights = [1, 0.9238795325112867, 1, 0.9238795325112867, 1, 0.9238795325112867, 1, 0.9238795325112867, 1, 0.9238795325112867, 1, 0.9238795325112867, 1, 0.9238795325112867, 1, 0.9238795325112867, 1]
    enl_vement_de_mati_re_balayage3_turn_rails = [Edge.make_bspline([Vector(p[0], p[1], 0).rotate(enl_vement_de_mati_re_balayage3_z, enl_vement_de_mati_re_balayage3_turn_angles[k]) / enl_vement_de_mati_re_balayage3_turn_weights[k] + Vector(0, 0, p[2] + ENL_VEMENT_DE_MATI_RE_BALAYAGE3_PITCH * enl_vement_de_mati_re_balayage3_turn_angles[k] / 360) for k in range(17)], [0, 0, 0, 1, 1, 2, 2, 3, 3, 4, 4, 5, 5, 6, 6, 7, 7, 8, 8, 8], 2, enl_vement_de_mati_re_balayage3_turn_weights) for p in enl_vement_de_mati_re_balayage3_corners]
    enl_vement_de_mati_re_balayage3_turn_sides = [Face.make_surface_from_curves(enl_vement_de_mati_re_balayage3_turn_rails[p[0]], enl_vement_de_mati_re_balayage3_turn_rails[p[1]]) for p in [(0, 1), (1, 2), (2, 3), (3, 0)]]
    enl_vement_de_mati_re_balayage3 = Plane(origin=(-4.190909091, 0, 0), x_dir=(0, 0, 1), z_dir=(1, 0, 0)) * Solid(Shell([*[p.moved(Location((0, 0, ENL_VEMENT_DE_MATI_RE_BALAYAGE3_PITCH * i))) for i in range(12) for p in enl_vement_de_mati_re_balayage3_turn_sides], enl_vement_de_mati_re_balayage3_cap, enl_vement_de_mati_re_balayage3_cap.rotate(enl_vement_de_mati_re_balayage3_z, 4320).moved(Location((0, 0, ENL_VEMENT_DE_MATI_RE_BALAYAGE3_PITCH * 4320 / 360)))]))
    add(enl_vement_de_mati_re_balayage3, mode=Mode.SUBTRACT)


with BuildPart() as part_1:
    add(part.part)

    # Fractionner1
    split(bisect_by=Plane(origin=(2.309090909, 0, 0), x_dir=(0, 0, 1), z_dir=(1, 0, 0)), keep=Keep.TOP)


with BuildPart() as body_2_1:
    add(body_2.part)

    # Combiner1: union part
    add(part_1.part)

    # Congé1
    cong_1_edges = [body_2_1.edges().sort_by_distance(p)[0] for p in [
        (5.709090909, -2.95, 0),
        (-3.190909091, 0, 1.4),
    ]]
    fillet(cong_1_edges, radius=CONG_1_R)

    # Sketch1 → Cut-Revolve1 (revolve, cut)
    with BuildSketch(Plane(origin=(0, 0, 0), x_dir=(1, 0, 0), z_dir=(0, 1, 0))):
        Polygon((2.759090909, 2.95), (10.307039448, 2.95), (10.307039448, 5.53408659), (-10.725109123, 5.53408659), (-10.725109123, 0.335117348), (2.759090909, 0.335117348), align=None)
        Polygon((10.307039448, -6.163499881), (10.307039448, -2.95), (2.759090909, -2.95), (2.759090909, 0), (-10.725109123, 0), (-10.725109123, -6.163499881), align=None)
    revolve(axis=Axis((-11.213736174, 0, 0), (1, 0, 0)), mode=Mode.SUBTRACT)


with BuildPart() as body_2_2:
    # Scale1: scaled about (7.582829496, 8.827e-06, -7.484e-06)
    add(body_2_1.part.scale(SCALE1_SCALE).moved(Location((-0.379141475, -4.41e-07, 3.74e-07))))


solid = body_2_2.part
